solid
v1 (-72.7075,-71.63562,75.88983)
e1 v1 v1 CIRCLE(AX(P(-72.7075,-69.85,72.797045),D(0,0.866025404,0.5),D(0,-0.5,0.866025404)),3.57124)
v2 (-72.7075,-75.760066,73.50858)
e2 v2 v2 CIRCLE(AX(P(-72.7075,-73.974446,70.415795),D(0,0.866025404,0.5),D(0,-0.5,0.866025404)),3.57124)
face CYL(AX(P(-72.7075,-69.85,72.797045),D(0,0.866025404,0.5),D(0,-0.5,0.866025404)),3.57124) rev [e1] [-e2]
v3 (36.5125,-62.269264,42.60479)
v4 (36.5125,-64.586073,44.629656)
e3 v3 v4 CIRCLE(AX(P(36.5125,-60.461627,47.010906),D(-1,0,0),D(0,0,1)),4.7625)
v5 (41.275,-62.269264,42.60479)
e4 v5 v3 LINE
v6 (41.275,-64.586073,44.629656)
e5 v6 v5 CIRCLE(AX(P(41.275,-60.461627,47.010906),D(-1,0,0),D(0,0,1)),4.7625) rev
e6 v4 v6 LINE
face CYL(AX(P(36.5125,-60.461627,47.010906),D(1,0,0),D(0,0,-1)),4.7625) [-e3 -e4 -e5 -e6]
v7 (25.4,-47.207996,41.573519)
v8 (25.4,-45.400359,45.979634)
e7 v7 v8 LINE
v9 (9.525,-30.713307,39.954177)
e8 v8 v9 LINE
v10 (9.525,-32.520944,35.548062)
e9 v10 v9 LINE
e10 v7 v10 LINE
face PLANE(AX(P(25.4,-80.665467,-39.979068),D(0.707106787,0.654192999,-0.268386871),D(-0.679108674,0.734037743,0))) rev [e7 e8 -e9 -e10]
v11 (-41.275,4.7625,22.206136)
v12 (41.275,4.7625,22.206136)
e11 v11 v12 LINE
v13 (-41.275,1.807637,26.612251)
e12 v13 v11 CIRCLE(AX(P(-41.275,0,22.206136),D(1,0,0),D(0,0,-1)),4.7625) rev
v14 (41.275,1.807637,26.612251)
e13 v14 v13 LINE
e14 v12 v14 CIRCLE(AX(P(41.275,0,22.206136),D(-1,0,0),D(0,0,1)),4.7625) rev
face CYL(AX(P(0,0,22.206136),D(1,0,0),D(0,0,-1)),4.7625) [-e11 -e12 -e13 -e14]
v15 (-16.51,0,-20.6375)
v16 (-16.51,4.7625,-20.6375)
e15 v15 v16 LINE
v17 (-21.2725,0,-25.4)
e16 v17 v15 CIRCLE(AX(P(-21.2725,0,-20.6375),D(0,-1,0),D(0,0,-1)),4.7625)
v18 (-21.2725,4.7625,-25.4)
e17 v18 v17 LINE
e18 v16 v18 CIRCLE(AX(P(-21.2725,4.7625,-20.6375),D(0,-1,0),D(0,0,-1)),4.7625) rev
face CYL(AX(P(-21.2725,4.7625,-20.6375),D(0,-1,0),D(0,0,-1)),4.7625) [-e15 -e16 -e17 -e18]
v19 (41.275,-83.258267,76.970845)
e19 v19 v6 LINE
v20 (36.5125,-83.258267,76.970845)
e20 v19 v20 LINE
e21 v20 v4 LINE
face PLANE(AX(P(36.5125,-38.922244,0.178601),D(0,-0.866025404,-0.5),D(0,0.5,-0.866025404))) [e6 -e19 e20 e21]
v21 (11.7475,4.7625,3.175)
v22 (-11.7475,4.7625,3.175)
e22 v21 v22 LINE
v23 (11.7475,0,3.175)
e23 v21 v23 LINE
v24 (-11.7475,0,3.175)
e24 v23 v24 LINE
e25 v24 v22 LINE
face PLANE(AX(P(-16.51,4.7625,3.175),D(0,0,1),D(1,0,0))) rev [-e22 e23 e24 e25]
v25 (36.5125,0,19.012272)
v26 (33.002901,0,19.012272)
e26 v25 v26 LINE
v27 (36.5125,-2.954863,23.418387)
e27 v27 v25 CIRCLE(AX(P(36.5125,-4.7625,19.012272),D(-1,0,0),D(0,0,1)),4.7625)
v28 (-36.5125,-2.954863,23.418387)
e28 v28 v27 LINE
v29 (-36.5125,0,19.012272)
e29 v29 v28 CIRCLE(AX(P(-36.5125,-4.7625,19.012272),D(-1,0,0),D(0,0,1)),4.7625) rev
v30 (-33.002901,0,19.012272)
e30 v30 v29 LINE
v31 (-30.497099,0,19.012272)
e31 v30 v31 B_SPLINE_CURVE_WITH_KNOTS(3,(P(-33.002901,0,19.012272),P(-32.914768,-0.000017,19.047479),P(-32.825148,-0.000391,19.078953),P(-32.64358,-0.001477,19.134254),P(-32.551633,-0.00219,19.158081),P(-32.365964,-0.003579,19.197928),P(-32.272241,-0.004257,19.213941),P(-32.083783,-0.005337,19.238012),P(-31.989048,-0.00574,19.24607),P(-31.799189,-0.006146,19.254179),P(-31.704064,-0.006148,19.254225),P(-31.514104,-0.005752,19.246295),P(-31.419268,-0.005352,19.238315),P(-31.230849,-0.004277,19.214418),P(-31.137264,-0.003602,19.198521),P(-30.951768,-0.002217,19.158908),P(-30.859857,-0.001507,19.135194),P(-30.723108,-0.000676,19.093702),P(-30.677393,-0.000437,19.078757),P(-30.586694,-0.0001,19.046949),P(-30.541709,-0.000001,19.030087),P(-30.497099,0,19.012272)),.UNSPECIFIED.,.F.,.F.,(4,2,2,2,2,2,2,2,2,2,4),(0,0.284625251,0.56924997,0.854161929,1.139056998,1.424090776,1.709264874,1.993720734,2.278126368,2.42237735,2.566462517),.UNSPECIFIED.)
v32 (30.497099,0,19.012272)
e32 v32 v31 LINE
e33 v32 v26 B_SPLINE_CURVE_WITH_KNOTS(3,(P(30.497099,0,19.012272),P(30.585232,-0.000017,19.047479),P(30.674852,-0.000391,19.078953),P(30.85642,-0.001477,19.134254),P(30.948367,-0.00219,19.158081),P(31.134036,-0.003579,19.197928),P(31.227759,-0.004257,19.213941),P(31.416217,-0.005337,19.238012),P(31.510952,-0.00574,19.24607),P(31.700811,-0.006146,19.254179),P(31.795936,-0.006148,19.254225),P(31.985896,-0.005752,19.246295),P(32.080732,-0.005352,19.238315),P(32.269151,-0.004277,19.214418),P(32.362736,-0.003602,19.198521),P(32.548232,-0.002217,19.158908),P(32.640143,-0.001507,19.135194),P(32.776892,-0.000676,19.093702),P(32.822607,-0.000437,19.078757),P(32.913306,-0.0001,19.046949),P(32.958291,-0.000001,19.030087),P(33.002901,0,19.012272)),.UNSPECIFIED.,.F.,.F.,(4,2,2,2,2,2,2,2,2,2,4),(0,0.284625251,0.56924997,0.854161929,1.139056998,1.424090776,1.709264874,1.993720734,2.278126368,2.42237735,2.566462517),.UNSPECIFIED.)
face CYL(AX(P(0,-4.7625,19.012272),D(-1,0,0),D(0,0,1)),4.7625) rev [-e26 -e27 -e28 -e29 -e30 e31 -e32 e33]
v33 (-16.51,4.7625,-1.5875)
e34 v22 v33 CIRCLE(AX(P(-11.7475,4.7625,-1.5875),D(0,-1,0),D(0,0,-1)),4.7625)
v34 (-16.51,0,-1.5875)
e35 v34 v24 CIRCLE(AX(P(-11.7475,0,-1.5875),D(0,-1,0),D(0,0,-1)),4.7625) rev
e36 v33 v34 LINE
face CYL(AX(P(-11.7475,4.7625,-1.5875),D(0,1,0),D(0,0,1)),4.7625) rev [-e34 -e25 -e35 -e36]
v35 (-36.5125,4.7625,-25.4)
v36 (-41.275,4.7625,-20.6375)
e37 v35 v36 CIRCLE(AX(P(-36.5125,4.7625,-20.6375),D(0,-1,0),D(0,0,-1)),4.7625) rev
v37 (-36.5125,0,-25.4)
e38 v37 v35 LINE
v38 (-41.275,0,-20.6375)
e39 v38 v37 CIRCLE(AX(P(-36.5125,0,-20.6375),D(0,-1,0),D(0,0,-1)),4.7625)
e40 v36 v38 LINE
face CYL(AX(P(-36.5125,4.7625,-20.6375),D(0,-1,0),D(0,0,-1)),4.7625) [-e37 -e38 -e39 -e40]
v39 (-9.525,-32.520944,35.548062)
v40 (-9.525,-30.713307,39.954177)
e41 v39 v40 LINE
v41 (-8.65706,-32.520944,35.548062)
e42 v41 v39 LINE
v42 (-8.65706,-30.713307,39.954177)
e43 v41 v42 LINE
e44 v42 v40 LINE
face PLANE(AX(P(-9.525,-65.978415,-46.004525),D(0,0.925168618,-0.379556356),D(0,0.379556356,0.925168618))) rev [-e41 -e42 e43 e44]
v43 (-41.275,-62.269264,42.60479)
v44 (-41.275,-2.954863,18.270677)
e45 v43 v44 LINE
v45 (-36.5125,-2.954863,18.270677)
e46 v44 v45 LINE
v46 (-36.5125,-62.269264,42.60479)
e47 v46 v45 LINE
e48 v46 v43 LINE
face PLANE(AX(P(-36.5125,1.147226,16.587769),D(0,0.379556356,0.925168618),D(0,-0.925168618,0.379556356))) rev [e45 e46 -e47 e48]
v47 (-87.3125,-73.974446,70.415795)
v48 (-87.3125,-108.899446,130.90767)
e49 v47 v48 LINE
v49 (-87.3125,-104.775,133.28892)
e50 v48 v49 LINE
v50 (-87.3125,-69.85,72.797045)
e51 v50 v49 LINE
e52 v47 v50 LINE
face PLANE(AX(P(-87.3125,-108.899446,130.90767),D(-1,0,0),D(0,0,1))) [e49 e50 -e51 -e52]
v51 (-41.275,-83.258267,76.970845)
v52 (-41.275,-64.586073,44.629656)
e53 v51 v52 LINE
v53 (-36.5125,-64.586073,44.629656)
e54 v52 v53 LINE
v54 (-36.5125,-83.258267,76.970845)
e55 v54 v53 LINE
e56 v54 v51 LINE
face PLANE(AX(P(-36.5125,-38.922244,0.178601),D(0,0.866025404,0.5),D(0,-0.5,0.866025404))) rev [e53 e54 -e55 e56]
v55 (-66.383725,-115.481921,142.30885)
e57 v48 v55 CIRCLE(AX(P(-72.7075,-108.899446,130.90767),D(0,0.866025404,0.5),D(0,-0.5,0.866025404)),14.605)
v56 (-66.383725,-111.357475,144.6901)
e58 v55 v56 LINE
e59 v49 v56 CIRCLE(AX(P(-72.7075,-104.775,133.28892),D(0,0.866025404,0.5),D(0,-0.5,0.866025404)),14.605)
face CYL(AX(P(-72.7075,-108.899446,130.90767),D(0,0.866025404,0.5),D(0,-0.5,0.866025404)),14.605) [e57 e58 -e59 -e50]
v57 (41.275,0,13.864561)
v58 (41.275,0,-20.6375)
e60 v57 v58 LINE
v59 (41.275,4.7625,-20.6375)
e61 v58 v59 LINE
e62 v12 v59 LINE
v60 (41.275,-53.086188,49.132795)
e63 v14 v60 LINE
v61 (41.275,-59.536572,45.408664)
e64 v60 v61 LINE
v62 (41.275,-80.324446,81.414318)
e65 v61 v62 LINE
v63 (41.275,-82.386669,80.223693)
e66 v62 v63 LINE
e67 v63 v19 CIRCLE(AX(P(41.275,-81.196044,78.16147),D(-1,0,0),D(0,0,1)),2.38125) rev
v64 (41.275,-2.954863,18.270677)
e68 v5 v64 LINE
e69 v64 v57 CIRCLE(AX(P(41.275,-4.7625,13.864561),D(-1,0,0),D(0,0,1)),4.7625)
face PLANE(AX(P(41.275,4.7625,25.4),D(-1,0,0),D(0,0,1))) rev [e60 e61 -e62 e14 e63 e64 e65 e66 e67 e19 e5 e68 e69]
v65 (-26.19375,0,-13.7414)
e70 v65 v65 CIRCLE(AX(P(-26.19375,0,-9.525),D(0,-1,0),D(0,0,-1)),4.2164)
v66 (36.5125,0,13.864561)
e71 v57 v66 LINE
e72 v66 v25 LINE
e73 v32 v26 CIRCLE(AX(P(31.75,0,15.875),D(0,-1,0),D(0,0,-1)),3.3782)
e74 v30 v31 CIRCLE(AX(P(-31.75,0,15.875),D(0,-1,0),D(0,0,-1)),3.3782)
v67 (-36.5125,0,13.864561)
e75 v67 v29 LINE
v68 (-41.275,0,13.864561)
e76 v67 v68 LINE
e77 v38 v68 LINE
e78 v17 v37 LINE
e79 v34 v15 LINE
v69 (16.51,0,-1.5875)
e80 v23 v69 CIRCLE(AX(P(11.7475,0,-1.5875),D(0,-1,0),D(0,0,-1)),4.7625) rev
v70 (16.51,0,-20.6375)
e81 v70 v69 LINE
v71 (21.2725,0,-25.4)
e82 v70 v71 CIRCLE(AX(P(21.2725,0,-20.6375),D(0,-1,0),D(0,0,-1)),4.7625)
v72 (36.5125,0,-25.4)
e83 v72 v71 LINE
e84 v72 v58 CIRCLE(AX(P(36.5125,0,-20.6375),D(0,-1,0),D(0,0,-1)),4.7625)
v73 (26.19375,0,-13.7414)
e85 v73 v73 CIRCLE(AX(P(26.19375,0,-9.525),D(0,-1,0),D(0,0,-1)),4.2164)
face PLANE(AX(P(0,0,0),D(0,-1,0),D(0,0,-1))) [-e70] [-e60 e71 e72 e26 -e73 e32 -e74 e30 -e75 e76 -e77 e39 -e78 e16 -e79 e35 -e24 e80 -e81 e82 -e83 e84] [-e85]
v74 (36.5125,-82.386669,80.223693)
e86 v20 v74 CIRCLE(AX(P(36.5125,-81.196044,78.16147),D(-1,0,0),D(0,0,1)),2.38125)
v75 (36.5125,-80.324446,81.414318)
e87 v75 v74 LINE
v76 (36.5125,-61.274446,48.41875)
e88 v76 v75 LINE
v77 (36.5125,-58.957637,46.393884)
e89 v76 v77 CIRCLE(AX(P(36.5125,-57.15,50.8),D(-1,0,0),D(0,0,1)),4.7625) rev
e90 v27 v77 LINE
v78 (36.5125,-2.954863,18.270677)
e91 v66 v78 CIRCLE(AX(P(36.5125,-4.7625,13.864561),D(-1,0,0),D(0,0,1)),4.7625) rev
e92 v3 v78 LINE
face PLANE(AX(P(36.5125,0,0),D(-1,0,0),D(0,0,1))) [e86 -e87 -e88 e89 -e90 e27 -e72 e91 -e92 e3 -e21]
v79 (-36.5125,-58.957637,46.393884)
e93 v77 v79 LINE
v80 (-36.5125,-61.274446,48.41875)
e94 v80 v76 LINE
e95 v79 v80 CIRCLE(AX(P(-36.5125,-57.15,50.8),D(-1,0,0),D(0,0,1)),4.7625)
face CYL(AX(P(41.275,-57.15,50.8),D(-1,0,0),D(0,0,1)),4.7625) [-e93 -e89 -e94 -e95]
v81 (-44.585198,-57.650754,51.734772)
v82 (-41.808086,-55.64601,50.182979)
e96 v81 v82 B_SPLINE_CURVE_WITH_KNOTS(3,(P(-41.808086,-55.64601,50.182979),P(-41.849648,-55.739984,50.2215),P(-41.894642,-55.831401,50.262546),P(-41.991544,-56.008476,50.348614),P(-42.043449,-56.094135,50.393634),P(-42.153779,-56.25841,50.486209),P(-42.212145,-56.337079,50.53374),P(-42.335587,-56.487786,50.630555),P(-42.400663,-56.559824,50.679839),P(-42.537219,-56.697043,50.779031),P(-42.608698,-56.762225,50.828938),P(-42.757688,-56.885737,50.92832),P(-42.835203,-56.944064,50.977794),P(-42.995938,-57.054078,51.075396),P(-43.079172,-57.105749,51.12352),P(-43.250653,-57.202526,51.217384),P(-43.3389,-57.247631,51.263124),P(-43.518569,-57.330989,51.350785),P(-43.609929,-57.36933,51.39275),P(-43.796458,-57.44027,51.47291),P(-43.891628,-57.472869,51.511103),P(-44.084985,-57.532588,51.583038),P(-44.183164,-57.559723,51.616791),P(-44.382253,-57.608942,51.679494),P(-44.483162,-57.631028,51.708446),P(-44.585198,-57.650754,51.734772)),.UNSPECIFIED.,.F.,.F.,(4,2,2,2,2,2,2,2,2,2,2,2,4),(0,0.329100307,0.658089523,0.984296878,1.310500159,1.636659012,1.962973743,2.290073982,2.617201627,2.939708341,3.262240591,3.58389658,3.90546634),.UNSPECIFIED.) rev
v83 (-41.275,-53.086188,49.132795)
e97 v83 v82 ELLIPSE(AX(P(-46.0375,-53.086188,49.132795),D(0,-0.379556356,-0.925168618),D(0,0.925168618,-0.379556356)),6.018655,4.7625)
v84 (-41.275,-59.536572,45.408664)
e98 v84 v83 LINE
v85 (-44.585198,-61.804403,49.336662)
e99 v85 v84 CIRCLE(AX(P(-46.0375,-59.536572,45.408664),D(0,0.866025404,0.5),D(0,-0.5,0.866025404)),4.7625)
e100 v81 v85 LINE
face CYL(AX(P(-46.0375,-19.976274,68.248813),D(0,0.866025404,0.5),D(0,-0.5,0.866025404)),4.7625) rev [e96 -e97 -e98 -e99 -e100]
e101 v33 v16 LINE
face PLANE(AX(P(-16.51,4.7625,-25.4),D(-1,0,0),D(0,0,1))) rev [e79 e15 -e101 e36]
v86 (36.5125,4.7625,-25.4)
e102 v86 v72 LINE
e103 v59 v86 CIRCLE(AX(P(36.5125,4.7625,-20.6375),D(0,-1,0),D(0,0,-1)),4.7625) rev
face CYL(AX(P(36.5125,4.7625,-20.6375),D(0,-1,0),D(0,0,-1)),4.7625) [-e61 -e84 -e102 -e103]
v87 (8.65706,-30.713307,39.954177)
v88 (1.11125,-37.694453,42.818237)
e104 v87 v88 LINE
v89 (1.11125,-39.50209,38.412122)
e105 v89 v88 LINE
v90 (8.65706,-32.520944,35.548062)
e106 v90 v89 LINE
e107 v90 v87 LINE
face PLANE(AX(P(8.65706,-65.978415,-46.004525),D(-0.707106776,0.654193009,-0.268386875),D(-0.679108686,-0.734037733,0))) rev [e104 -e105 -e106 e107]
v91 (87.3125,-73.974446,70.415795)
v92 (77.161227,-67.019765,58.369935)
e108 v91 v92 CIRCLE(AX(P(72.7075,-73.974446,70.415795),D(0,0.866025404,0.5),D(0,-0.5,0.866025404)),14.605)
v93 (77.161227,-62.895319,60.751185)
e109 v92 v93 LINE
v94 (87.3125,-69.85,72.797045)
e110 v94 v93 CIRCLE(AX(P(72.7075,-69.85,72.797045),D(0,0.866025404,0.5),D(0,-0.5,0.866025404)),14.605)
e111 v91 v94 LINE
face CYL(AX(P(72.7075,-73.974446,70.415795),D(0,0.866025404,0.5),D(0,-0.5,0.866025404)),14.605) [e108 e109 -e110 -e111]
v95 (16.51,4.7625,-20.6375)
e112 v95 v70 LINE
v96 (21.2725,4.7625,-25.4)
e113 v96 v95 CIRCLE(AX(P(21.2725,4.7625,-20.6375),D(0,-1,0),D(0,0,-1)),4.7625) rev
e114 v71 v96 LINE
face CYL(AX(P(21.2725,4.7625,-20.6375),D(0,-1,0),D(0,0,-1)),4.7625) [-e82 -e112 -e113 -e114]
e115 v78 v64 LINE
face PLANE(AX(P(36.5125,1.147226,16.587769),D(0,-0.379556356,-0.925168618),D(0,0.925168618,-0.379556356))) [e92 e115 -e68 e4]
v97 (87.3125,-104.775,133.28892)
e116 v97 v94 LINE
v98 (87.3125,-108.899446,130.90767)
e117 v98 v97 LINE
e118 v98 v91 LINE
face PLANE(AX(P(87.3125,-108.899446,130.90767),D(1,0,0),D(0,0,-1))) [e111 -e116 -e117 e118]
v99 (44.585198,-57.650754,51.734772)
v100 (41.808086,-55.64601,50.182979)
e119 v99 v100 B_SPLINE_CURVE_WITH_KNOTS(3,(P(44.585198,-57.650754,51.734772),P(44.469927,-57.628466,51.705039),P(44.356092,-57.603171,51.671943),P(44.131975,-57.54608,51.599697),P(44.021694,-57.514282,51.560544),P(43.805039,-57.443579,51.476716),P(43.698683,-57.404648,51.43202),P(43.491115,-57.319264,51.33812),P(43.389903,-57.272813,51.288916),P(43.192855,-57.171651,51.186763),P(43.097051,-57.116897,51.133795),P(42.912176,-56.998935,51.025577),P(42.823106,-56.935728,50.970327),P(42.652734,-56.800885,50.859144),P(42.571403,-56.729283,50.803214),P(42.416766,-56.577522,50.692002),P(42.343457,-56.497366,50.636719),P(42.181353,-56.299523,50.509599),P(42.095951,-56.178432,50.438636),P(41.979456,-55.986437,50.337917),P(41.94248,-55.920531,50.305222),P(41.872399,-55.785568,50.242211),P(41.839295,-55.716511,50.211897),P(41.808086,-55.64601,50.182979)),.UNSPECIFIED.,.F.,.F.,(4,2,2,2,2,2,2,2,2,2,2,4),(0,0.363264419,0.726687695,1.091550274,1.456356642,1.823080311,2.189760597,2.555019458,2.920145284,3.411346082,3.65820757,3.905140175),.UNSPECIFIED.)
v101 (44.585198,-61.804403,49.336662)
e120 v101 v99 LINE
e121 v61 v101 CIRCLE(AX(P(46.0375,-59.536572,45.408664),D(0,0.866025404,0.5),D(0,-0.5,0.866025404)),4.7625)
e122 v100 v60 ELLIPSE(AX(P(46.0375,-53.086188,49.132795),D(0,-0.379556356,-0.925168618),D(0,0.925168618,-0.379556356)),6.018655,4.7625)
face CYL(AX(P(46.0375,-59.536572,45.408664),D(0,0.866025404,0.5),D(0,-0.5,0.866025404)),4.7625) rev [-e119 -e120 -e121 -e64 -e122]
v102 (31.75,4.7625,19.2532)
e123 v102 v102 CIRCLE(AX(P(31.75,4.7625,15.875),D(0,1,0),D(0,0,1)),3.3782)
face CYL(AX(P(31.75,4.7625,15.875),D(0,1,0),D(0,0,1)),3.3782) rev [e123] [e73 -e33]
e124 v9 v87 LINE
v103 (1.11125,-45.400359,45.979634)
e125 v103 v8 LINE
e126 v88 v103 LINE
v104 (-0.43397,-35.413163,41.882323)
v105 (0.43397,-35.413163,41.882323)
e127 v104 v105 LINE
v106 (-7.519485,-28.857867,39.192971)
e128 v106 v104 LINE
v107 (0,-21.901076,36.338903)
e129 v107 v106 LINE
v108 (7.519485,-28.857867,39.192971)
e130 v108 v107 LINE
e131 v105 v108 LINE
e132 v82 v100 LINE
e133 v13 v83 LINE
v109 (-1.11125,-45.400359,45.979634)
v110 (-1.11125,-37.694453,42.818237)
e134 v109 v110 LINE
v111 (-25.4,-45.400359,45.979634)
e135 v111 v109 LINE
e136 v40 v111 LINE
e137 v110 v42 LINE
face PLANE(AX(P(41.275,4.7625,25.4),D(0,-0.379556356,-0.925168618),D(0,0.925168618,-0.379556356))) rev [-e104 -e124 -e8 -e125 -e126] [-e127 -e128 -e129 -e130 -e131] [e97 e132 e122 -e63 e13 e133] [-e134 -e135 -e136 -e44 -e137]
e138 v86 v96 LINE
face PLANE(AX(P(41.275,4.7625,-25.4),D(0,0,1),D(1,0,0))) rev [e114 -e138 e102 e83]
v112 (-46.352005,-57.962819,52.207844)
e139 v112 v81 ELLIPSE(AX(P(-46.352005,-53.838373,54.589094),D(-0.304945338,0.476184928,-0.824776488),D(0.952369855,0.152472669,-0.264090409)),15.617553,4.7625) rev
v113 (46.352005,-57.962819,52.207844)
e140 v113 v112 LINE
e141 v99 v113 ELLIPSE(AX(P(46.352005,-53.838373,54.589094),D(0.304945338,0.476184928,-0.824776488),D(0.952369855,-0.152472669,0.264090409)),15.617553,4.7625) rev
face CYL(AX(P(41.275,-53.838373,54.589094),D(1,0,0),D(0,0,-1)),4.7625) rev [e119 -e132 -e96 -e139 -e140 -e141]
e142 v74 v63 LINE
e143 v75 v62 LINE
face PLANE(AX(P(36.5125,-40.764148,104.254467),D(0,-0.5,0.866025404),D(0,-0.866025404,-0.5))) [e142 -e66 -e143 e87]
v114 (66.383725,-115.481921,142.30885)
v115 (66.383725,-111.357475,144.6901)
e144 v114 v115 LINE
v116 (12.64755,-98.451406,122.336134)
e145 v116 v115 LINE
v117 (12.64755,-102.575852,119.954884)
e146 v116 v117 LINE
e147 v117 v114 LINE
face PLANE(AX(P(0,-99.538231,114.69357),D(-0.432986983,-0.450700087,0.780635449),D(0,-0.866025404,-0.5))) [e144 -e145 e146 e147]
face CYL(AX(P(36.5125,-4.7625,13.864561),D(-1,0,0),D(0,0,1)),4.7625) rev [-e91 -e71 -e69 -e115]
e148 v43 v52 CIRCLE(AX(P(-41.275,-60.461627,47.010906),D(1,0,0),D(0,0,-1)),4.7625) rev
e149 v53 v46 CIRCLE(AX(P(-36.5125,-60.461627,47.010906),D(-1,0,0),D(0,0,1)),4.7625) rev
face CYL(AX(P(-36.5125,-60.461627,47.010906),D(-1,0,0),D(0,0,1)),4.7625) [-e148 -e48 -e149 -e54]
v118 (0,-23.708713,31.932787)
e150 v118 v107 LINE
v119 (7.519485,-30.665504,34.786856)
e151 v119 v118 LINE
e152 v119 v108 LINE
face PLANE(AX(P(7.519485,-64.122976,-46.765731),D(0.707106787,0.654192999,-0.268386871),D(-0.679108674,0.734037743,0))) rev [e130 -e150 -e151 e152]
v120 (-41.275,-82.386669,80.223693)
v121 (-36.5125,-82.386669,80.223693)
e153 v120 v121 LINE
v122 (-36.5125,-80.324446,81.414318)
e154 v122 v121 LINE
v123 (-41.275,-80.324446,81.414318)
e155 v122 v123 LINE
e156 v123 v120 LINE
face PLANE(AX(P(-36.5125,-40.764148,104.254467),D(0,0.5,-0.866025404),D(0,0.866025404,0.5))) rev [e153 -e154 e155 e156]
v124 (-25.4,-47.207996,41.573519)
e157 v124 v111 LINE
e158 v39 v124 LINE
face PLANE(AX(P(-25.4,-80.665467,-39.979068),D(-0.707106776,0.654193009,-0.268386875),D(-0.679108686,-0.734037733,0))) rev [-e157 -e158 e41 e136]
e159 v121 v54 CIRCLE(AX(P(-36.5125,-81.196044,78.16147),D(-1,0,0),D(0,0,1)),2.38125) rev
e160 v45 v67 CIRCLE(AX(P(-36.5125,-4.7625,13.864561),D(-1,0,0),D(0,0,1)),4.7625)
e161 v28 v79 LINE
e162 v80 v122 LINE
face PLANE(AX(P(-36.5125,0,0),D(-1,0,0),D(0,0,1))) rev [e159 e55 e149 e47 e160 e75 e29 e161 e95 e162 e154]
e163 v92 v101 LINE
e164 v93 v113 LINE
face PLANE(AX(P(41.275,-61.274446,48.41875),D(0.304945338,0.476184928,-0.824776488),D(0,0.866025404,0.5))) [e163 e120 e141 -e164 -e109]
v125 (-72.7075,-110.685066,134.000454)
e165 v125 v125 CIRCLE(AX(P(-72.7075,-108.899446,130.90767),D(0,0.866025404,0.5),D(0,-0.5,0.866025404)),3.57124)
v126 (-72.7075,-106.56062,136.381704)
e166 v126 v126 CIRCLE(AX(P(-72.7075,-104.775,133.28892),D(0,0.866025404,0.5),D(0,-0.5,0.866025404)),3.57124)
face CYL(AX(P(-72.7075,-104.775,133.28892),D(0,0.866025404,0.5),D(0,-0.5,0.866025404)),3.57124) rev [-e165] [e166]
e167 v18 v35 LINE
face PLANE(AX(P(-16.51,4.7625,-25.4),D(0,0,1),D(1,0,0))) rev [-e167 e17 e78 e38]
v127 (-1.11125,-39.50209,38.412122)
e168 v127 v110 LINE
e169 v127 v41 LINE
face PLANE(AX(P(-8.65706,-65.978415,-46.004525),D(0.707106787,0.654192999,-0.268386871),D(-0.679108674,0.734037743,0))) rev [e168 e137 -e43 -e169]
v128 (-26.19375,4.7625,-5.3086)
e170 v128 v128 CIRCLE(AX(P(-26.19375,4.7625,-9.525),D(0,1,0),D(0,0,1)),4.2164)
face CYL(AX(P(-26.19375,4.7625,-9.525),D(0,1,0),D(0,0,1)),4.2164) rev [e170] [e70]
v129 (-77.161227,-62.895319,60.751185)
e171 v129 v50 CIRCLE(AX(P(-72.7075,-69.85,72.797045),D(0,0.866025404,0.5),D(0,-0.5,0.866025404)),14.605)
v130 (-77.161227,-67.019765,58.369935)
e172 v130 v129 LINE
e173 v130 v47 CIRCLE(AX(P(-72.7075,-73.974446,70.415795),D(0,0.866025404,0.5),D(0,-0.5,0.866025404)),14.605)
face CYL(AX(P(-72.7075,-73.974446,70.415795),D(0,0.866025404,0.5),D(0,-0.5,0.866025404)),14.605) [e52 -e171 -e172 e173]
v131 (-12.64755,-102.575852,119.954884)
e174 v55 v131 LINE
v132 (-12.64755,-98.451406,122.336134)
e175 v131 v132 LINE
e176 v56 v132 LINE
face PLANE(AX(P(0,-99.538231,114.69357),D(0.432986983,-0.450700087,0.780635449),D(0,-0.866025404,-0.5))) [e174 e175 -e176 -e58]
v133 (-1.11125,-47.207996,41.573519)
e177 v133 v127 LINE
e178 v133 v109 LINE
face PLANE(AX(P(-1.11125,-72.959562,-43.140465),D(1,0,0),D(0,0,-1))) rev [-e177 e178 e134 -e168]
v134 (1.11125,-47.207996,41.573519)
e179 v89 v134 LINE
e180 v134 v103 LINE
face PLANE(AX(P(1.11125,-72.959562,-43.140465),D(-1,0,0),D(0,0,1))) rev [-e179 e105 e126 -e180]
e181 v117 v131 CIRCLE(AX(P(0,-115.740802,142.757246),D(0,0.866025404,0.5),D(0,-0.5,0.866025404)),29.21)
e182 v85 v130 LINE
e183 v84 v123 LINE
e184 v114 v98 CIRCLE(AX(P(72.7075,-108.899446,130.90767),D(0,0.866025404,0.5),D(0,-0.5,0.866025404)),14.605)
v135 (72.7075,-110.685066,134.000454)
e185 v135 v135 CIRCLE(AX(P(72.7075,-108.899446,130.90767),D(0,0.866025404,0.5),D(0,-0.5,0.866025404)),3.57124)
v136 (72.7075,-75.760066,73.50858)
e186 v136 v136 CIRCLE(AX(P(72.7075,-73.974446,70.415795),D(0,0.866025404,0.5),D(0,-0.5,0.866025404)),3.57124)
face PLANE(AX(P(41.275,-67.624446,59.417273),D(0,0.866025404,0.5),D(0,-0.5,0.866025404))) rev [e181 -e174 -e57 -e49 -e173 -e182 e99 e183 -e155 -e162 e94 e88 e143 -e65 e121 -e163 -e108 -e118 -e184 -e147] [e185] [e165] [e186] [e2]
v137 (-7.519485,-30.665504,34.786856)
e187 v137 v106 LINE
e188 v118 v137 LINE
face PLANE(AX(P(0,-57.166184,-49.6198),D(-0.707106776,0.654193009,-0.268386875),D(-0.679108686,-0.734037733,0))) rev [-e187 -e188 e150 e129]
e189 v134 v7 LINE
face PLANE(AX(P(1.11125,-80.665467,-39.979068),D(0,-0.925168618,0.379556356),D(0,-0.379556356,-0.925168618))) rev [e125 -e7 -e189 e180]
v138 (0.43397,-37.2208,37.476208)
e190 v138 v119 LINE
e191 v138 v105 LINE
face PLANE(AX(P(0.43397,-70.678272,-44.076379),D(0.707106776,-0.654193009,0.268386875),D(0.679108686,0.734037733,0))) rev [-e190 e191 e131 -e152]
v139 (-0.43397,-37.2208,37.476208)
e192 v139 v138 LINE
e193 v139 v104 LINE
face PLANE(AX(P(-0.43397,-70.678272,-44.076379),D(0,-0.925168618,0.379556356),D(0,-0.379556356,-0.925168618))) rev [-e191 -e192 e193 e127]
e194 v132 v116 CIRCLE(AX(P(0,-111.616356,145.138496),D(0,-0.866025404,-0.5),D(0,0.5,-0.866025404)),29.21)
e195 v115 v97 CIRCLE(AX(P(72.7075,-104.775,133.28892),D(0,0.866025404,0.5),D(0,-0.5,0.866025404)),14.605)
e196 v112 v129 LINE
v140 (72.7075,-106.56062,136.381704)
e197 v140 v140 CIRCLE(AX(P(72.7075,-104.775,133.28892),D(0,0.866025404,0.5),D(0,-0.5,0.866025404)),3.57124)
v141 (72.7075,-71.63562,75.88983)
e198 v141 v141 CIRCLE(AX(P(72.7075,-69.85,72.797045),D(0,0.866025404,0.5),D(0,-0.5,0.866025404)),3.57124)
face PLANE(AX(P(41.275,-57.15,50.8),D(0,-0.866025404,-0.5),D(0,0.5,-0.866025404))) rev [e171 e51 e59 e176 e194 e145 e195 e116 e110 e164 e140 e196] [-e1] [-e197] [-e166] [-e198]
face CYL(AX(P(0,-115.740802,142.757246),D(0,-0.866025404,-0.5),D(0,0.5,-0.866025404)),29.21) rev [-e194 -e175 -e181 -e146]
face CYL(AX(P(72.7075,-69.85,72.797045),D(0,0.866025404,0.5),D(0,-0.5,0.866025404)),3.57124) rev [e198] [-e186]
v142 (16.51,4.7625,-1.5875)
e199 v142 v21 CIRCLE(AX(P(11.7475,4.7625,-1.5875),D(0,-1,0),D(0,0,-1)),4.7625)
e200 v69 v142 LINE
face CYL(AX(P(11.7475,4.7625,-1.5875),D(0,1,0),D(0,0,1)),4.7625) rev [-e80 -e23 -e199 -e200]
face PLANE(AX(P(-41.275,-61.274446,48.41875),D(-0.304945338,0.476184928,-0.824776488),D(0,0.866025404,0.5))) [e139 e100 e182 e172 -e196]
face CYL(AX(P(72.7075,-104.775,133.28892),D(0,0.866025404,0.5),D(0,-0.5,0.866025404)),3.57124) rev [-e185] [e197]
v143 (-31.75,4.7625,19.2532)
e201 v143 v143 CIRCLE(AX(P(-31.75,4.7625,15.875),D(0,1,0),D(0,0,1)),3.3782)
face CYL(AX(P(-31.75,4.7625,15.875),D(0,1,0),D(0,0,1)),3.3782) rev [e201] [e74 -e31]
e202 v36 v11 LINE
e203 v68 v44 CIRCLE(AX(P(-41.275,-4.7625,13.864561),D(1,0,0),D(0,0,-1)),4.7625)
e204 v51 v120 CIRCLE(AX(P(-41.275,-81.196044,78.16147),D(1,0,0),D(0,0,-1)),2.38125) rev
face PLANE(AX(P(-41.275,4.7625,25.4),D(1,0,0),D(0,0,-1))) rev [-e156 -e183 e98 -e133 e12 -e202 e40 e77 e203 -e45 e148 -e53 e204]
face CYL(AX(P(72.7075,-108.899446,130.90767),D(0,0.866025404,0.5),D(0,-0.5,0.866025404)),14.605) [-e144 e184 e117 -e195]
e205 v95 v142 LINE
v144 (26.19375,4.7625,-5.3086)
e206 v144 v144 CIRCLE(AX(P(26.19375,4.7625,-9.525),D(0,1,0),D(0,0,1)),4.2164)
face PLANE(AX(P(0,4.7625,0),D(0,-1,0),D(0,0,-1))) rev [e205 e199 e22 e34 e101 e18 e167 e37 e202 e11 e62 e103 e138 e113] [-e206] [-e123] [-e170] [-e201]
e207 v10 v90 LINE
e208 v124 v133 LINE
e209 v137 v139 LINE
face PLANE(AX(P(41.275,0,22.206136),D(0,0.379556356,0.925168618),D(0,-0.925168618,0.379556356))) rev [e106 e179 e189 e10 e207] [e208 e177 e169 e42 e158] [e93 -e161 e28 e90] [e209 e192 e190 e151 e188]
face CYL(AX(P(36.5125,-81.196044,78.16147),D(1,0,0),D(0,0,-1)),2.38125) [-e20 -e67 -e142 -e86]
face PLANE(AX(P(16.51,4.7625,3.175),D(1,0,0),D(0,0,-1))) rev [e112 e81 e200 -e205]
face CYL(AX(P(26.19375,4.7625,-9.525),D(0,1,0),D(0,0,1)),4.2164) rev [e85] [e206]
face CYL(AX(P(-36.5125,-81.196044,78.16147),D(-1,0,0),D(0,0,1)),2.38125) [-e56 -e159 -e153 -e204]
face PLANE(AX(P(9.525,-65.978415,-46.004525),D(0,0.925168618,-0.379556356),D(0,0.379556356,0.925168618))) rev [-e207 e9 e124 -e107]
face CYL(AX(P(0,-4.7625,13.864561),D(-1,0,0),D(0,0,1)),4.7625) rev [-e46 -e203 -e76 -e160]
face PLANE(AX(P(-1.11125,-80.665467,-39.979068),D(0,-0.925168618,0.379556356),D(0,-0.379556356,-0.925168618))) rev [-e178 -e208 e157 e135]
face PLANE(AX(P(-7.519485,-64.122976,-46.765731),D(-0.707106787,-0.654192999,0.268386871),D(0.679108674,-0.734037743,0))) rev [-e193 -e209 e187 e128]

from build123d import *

# Parameters (mm, degrees)
BOSS_EXTRUDE1_DEPTH      = 4.7625
BOSS_EXTRUDE2_DEPTH      = 41.275
BOSS_EXTRUDE4_START      = 41.275
BOSS_EXTRUDE4_DEPTH      = 4.7625
BOSS_EXTRUDE5_START      = -41.275
BOSS_EXTRUDE5_DEPTH      = 4.7625
BOSS_EXTRUDE3_DEPTH      = 4.7625
CUT_EXTRUDE1_DEPTH       = 197.1201289744139
FILLET3_R                = 4.7625
FILLET5_R                = 29.209999999999997
F_1_4_CLEARANCE_HOLE1_D  = 6.7564
F_5_16_CLEARANCE_HOLE1_D = 8.4328
F_1_4_CLEARANCE_HOLE2_D  = 7.14248
FILLET6_R                = 2.3812499999999996


with BuildPart() as part:
    # Sketch1 → Boss-Extrude1 (new body)
    with BuildSketch(Plane(origin=(0, 0, 0), x_dir=(1, 0, 0), z_dir=(0, 1, 0))):
        Polygon((41.275, -25.39999999999999), (-41.275, -25.400000000000002), (-41.275, 25.4), (-16.510000000000005, 25.4), (-16.509999999999998, -3.1750000000000003), (16.509999999999998, -3.1749999999999963), (16.509999999999998, 25.400000000000002), (41.275, 25.400000000000006), align=None)
    extrude(amount=BOSS_EXTRUDE1_DEPTH)

    # Sketch6 → Boss-Extrude2 (add, symmetric)
    with BuildSketch(Plane(origin=(0, 0, 0), x_dir=(0, 0, -1), z_dir=(1, 0, 0))):
        Polygon((-22.20613588199718, 0), (-47.01090584437518, -60.46162678329637), (-59.41727262806233, -67.62444598552347), (-61.79852262806233, -63.50000000000006), (-50.8, -57.15), (-25.39999999999999, 4.7625), (-25.39999999999999, 0), align=None)
    extrude(amount=BOSS_EXTRUDE2_DEPTH, both=True)

    # Sketch10 → Boss-Extrude4 (add)
    with BuildSketch(Plane(origin=(0, 0, 0), x_dir=(0, 0, -1), z_dir=(1, 0, 0)).offset(BOSS_EXTRUDE4_START)):
        Polygon((-17.05842561014821, 0), (-43.22181168875039, -63.77325356659284), (-79.03306788418706, -84.44889197104685), (-81.41431788418706, -80.32444598552347), (-47.01090584437518, -60.46162678329637), (-22.20613588199718, 0), align=None)
    extrude(amount=-BOSS_EXTRUDE4_DEPTH)

    # Sketch10<2> → Boss-Extrude5 (add)
    with BuildSketch(Plane(origin=(0, 0, 0), x_dir=(0, 0, -1), z_dir=(1, 0, 0)).offset(BOSS_EXTRUDE5_START)):
        Polygon((-17.05842561014821, 0), (-43.22181168875039, -63.77325356659284), (-79.03306788418706, -84.44889197104685), (-81.41431788418706, -80.32444598552347), (-47.01090584437518, -60.46162678329637), (-22.20613588199718, 0), align=None)
    extrude(amount=BOSS_EXTRUDE5_DEPTH)

    # Sketch7 → Boss-Extrude3 (add)
    with BuildSketch(Plane(origin=(0, -20.865454743874867, -12.046675913140254), x_dir=(1, 0, 0), z_dir=(0, 0.866025403784436, 0.5000000000000046))):
        with BuildLine():
            Line((-87.3125, -167.81909051224963), (-87.31250000000001, -97.96909051224961))
            ThreePointArc((-87.31250000000001, -97.96909051224961), (-84.50480271700945, -89.35923141913764), (-77.16122665481106, -84.05972877692089))
            Line((-77.16122665481106, -84.05972877692089), (-41.275, -72.5690905122496))
            Line((-41.275, -72.5690905122496), (41.275, -72.5690905122496))
            Line((41.275, -72.5690905122496), (77.16122665481105, -84.0597287769209))
            ThreePointArc((77.16122665481105, -84.0597287769209), (84.50480271700943, -89.35923141913766), (87.31250000000001, -97.96909051224961))
            Line((87.31250000000001, -97.96909051224961), (87.31250000000001, -167.81909051224963))
            ThreePointArc((87.31250000000001, -167.81909051224963), (80.4839803351822, -180.18162983863905), (66.38372511516263, -180.98404004522925))
            Line((66.38372511516263, -180.98404004522925), (0, -149.09666116895025))
            Line((0, -149.09666116895025), (-66.38372511516263, -180.98404004522925))
            ThreePointArc((-66.38372511516263, -180.98404004522925), (-80.48398033518218, -180.18162983863903), (-87.3125, -167.81909051224963))
        make_face()
    extrude(amount=-BOSS_EXTRUDE3_DEPTH)

    # Sketch11 → Cut-Extrude1 (cut, through all)
    with BuildSketch(Plane(origin=(0, 9.605402363534044, 23.413168261114233), x_dir=(1, 0, 0), z_dir=(0, 0.37955635625630607, 0.9251686183747458))):
        Polygon((-25.400000388402205, -59.45484943793708), (-9.52500014565082, -43.57984943793708), (-8.657059559184285, -43.57984943793708), (-1.1112499999999998, -51.12565911250755), (-1.1112499999999998, -59.45484943793708), align=None)
        Polygon((1.1112499999999998, -59.45484943793708), (25.399999611597792, -59.45484943793708), (9.524999854349167, -43.57984943793708), (8.657059789956651, -43.57984943793708), (1.1112499999999998, -51.12565911250755), align=None)
        Polygon((0.4339700458708439, -48.65984943793709), (7.519485019617413, -41.57433457253814), (0, -34.05484943793708), (-7.519485012578843, -41.574334335532285), (-0.43397001852167266, -48.65984943793709), align=None)
    extrude(amount=-CUT_EXTRUDE1_DEPTH, mode=Mode.SUBTRACT)

    # Fillet3
    fillet3_edges = [part.edges().sort_by_distance(p)[0] for p in [
        (-41.275, 2.38125, -25.4),
    ]]
    fillet(fillet3_edges, radius=FILLET3_R)
    fillet3_2_edges = [part.edges().sort_by_distance(p)[0] for p in [
        (-41.275, -59.21222299276168, 49.60937499999998),
    ]]
    fillet(fillet3_2_edges, radius=FILLET3_R)
    fillet3_3_edges = [part.edges().sort_by_distance(p)[0] for p in [
        (-16.510000000000005, 2.38125, -25.4),
    ]]
    fillet(fillet3_3_edges, radius=FILLET3_R)
    fillet3_4_edges = [part.edges().sort_by_distance(p)[0] for p in [
        (-38.89375, 0, 17.05842561014821),
    ]]
    fillet(fillet3_4_edges, radius=FILLET3_R)
    fillet3_5_edges = [part.edges().sort_by_distance(p)[0] for p in [
        (0, 0, 22.20613588199718),
    ]]
    fillet(fillet3_5_edges, radius=FILLET3_R)
    fillet3_6_edges = [part.edges().sort_by_distance(p)[0] for p in [
        (38.89375, 0, 17.05842561014821),
    ]]
    fillet(fillet3_6_edges, radius=FILLET3_R)
    fillet3_7_edges = [part.edges().sort_by_distance(p)[0] for p in [
        (-38.89375, -63.77325356659284, 43.22181168875039),
    ]]
    fillet(fillet3_7_edges, radius=FILLET3_R)
    fillet3_8_edges = [part.edges().sort_by_distance(p)[0] for p in [
        (0, -60.46162678329637, 47.01090584437518),
    ]]
    fillet(fillet3_8_edges, radius=FILLET3_R)
    fillet3_9_edges = [part.edges().sort_by_distance(p)[0] for p in [
        (-0.7533233620346138, -57.15, 50.8),
    ]]
    fillet(fillet3_9_edges, radius=FILLET3_R)
    fillet3_10_edges = [part.edges().sort_by_distance(p)[0] for p in [
        (0, 4.7625, 25.4),
    ]]
    fillet(fillet3_10_edges, radius=FILLET3_R)
    fillet3_11_edges = [part.edges().sort_by_distance(p)[0] for p in [
        (-16.509999999999998, 2.38125, 3.1750000000000003),
    ]]
    fillet(fillet3_11_edges, radius=FILLET3_R)
    fillet3_12_edges = [part.edges().sort_by_distance(p)[0] for p in [
        (16.509999999999998, 2.38125, 3.1749999999999963),
    ]]
    fillet(fillet3_12_edges, radius=FILLET3_R)
    fillet3_13_edges = [part.edges().sort_by_distance(p)[0] for p in [
        (16.509999999999998, 2.38125, -25.400000000000002),
    ]]
    fillet(fillet3_13_edges, radius=FILLET3_R)
    fillet3_14_edges = [part.edges().sort_by_distance(p)[0] for p in [
        (38.89375, -63.77325356659284, 43.22181168875039),
    ]]
    fillet(fillet3_14_edges, radius=FILLET3_R)
    fillet3_15_edges = [part.edges().sort_by_distance(p)[0] for p in [
        (41.275, 2.38125, -25.400000000000006),
    ]]
    fillet(fillet3_15_edges, radius=FILLET3_R)
    fillet3_16_edges = [part.edges().sort_by_distance(p)[0] for p in [
        (41.275, -59.0883646148863, 49.68088466780772),
    ]]
    fillet(fillet3_16_edges, radius=FILLET3_R)

    # Fillet5
    fillet5_edges = [part.edges().sort_by_distance(p)[0] for p in [
        (0, -97.47600832111236, 115.88419527861113),
    ]]
    fillet(fillet5_edges, radius=FILLET5_R)

    # 1/4 Clearance Hole1 (through all)
    with Locations(Plane(origin=(0, 4.7625, 0), x_dir=(1, 0, 0), z_dir=(0, 1, 0))):
        with Locations((-31.75, -15.875), (31.75, -15.875)):
            Hole(F_1_4_CLEARANCE_HOLE1_D / 2)

    # 5/16 Clearance Hole1 (through all)
    with Locations(Plane(origin=(0, 4.7625, 0), x_dir=(1, 0, 0), z_dir=(0, 1, 0))):
        with Locations((-26.19375, 9.525), (26.19375, 9.525)):
            Hole(F_5_16_CLEARANCE_HOLE1_D / 2)

    # 1/4 Clearance Hole2 (through all)
    with Locations(Plane(origin=(0, -20.865454743874867, -12.046675913140254), x_dir=(1, 0, 0), z_dir=(0, 0.866025403784436, 0.5000000000000046))):
        with Locations((-72.7075, -97.969090512), (-72.7075, -167.819090512), (72.7075, -167.819090512), (72.7075, -97.969090512)):
            Hole(F_1_4_CLEARANCE_HOLE2_D / 2)

    # Fillet6
    fillet6_edges = [part.edges().sort_by_distance(p)[0] for p in [
        (38.89375, -84.44889197104685, 79.03306788418706),
        (-38.89375, -84.44889197104685, 79.03306788418706),
    ]]
    fillet(fillet6_edges, radius=FILLET6_R)


solid = part.part
